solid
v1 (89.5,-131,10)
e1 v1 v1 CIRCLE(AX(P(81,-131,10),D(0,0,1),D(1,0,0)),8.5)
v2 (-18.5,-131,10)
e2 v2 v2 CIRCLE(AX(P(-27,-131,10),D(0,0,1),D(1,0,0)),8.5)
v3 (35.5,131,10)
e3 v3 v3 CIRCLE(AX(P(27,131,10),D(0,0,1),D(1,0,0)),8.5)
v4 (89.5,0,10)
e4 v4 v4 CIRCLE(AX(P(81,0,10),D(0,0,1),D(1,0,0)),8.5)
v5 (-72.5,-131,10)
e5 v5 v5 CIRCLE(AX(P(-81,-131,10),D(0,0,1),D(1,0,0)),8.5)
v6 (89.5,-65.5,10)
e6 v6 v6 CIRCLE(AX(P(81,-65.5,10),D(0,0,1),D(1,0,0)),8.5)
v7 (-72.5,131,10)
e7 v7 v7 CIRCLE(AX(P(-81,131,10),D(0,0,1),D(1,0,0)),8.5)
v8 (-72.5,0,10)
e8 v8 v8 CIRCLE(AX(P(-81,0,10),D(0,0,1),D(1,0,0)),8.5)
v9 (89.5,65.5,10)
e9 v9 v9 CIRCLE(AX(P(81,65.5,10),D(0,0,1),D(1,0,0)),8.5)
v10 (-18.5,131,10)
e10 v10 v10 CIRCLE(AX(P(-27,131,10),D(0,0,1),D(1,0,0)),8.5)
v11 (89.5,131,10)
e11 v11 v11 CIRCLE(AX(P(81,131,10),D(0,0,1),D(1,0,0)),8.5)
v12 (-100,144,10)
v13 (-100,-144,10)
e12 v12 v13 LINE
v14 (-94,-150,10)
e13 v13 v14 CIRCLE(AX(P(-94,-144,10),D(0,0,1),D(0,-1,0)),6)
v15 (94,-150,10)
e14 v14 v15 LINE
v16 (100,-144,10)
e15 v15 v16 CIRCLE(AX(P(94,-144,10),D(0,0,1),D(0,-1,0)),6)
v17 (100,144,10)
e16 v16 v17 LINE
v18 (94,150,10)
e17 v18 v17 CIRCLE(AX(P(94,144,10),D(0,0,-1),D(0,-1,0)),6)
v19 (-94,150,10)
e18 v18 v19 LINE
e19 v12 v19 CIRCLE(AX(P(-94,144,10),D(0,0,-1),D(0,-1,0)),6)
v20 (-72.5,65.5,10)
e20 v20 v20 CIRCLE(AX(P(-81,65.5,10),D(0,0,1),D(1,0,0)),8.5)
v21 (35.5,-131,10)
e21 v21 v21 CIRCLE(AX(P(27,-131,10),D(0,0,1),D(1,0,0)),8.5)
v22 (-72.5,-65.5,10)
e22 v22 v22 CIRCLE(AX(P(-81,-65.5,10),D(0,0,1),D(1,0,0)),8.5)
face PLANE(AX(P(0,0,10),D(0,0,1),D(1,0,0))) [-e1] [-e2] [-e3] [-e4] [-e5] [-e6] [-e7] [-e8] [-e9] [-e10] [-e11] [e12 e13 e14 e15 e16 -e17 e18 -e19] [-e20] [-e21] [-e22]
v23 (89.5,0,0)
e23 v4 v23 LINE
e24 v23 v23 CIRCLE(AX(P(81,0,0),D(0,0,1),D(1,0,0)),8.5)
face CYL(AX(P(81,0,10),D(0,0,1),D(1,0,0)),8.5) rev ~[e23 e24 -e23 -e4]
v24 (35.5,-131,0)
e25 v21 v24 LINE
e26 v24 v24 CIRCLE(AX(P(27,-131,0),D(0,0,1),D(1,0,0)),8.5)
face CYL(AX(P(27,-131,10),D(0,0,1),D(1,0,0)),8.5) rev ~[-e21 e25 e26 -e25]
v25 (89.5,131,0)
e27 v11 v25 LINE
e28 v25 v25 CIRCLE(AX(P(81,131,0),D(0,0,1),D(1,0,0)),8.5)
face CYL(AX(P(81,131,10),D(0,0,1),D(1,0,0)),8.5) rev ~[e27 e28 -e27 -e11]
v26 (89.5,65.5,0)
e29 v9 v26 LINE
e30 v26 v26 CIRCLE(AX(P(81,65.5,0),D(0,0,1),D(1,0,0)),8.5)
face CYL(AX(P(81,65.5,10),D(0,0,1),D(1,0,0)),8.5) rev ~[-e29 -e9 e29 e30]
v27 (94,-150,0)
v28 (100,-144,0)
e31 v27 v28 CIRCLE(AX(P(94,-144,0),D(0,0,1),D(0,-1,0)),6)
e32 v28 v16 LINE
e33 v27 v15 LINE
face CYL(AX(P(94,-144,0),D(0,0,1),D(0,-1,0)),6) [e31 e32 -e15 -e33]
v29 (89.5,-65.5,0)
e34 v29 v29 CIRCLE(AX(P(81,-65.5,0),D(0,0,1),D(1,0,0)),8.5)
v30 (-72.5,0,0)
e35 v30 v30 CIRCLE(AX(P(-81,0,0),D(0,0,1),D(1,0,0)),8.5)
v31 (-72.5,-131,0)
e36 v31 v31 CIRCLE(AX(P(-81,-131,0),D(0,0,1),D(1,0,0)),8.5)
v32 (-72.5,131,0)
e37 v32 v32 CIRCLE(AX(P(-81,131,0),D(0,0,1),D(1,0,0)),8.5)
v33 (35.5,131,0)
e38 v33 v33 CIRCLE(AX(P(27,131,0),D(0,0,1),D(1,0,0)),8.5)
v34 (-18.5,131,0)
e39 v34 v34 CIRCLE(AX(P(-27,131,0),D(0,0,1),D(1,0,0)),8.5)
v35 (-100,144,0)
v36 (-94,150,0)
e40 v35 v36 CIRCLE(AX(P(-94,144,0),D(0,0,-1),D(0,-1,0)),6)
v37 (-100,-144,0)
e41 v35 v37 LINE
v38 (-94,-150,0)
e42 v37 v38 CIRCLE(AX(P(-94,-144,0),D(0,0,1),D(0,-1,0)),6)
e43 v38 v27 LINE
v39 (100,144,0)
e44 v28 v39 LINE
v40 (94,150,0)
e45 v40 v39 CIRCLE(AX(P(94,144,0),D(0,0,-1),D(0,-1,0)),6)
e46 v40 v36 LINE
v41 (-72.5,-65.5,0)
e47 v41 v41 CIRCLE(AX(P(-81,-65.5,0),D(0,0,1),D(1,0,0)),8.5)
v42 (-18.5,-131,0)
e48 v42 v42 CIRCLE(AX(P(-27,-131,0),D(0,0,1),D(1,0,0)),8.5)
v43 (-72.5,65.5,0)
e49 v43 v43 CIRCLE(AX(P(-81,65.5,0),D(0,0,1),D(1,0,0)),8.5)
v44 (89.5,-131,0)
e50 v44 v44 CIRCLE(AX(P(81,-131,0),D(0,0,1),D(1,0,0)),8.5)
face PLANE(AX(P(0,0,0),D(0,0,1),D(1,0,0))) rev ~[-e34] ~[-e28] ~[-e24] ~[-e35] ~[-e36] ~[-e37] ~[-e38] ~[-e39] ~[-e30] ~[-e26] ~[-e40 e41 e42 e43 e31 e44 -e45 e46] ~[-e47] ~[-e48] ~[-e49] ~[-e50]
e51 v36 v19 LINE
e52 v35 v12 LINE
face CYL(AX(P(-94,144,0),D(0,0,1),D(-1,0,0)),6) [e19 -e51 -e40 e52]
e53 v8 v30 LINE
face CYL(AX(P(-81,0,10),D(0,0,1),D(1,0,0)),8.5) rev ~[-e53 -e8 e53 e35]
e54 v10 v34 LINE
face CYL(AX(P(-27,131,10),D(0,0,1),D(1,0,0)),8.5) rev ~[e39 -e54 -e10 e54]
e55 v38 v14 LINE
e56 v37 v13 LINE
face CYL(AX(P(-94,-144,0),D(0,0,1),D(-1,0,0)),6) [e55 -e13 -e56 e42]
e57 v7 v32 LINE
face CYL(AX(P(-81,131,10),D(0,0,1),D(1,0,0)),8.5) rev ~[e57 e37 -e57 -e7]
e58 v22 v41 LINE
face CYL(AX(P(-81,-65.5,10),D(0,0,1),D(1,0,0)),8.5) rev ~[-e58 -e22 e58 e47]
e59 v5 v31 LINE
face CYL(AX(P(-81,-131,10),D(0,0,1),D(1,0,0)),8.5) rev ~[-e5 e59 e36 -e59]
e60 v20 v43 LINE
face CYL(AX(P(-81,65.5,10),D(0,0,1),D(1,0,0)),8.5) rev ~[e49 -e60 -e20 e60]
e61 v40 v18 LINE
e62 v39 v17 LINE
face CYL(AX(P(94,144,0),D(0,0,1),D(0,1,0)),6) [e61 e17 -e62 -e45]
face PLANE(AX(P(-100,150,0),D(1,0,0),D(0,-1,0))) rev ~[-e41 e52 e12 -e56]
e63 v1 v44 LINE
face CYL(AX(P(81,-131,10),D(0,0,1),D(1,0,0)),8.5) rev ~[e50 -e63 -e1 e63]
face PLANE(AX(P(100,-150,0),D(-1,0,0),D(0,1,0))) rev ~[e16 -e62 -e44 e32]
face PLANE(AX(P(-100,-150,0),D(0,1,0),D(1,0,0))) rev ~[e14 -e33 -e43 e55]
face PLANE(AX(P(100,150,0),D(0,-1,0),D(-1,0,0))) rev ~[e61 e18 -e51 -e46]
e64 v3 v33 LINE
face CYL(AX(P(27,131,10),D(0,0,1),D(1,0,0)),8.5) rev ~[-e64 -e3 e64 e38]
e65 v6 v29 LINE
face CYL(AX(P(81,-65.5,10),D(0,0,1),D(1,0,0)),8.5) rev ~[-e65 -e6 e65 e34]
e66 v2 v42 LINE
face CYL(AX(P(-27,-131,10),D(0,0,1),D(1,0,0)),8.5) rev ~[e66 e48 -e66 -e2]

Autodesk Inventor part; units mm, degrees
ref_plane "YZ Plane" through (0, 0, 0) normal (1, 0, 0) x (0, 1, 0)
ref_plane "XZ Plane" through (0, 0, 0) normal (0, 1, 0) x (-1, 0, 0)
ref_plane "XY Plane" through (0, 0, 0) normal (0, 0, 1) x (1, 0, 0)
sketch "Sketch2" plane through (0, 0, 0) normal (0, 0, 1) x (1, 0, 0)
  line L0 (-50, -100) -> (50, -100)
  line L1 (50, -100) -> (50, 100)
  line L2 (50, 100) -> (-50, 100)
  line L3 (-50, 100) -> (-50, -100)
  line L4 (-50, -100) -> (50, 100) construction
  line L5 (50, -100) -> (-50, 100) construction
  line L6 (-100, -150) -> (100, -150)
  line L7 (100, -150) -> (100, 150)
  line L8 (100, 150) -> (-100, 150)
  line L9 (-100, 150) -> (-100, -150)
  point P0 (0, 0)
  dimension "d29" = 100
  dimension "d30" = 200
  dimension "d31" = 50
extrude "Plate2" add sketch "Sketch2" along normal blind 10 contours L3 L2 L1 L0 | L9 L8 L7 L6
sketch "Sketch5" plane through (0, 0, 10) normal (0, 0, 1) x (1, 0, 0)
  line L0 (100, -150) -> (-100, -150) construction
  line L1 (100, 150) -> (100, -150) construction
  line L2 (-100, 150) -> (100, 150) construction
  line L3 (-100, -150) -> (-100, 150) construction
  line L4 (-81, 131) -> (81, 131) construction
  line L5 (81, 131) -> (81, -131) construction
  line L6 (81, -131) -> (-81, -131) construction
  line L7 (-81, -131) -> (-81, 131) construction
  circle A0 centre (-81, -131) radius 8.5
  circle A1 centre (-81, 131) radius 8.5
  circle A2 centre (-81, 0) radius 8.5
  circle A3 centre (-81, -65.5) radius 8.5
  circle A4 centre (-81, 65.5) radius 8.5
  line L8 (-50, 0) -> (50, 0) construction
  circle A5 centre (-27, -131) radius 8.5
  circle A6 centre (-27, -65.5) radius 8.5
  circle A7 centre (-27, 0) radius 8.5
  circle A8 centre (-27, 65.5) radius 8.5
  circle A9 centre (-27, 131) radius 8.5
  circle A10 centre (27, -131) radius 8.5
  circle A11 centre (27, -65.5) radius 8.5
  circle A12 centre (27, 0) radius 8.5
  circle A13 centre (27, 65.5) radius 8.5
  circle A14 centre (27, 131) radius 8.5
  circle A15 centre (81, -131) radius 8.5
  circle A16 centre (81, -65.5) radius 8.5
  circle A17 centre (81, 0) radius 8.5
  circle A18 centre (81, 65.5) radius 8.5
  circle A19 centre (81, 131) radius 8.5
  point P0 (0, 0)
  point P1 (0, -131)
  dimension "d33" = 17
  dimension "d34" = 19
  dimension "d35" = 65.5
  dimension "d36" = 65.5
  dimension "d39" = 54
extrude "Cut3" cut sketch "Sketch5" against normal blind 10 contours A0 | A1 | A2 | A3 | A4 | A5 | A9 | A10 | A14 | A15 | A16 | A17 | A18 | A19
fillet "Corner Round1" radius 6 4 edges at (-100, -150, 5) (-100, 150, 5) (100, 150, 5) (100, -150, 5)
equation "\"d35\" = d36"
equation "\"d44\" = Thickness"
equation "\"d14\" = Thickness"
equation "\"BendReliefDepth\" = 0.5 * Thickness"
equation "\"TransitionRadius\" = BendRadius"
equation "\"JacobiRadiusSize\" = BendRadius"
equation "\"Thickness\" = 10"
equation "\"BendRadius\" = 6"
properties part number "PRS 9607 charging flange rect_1200" material "Steel"
